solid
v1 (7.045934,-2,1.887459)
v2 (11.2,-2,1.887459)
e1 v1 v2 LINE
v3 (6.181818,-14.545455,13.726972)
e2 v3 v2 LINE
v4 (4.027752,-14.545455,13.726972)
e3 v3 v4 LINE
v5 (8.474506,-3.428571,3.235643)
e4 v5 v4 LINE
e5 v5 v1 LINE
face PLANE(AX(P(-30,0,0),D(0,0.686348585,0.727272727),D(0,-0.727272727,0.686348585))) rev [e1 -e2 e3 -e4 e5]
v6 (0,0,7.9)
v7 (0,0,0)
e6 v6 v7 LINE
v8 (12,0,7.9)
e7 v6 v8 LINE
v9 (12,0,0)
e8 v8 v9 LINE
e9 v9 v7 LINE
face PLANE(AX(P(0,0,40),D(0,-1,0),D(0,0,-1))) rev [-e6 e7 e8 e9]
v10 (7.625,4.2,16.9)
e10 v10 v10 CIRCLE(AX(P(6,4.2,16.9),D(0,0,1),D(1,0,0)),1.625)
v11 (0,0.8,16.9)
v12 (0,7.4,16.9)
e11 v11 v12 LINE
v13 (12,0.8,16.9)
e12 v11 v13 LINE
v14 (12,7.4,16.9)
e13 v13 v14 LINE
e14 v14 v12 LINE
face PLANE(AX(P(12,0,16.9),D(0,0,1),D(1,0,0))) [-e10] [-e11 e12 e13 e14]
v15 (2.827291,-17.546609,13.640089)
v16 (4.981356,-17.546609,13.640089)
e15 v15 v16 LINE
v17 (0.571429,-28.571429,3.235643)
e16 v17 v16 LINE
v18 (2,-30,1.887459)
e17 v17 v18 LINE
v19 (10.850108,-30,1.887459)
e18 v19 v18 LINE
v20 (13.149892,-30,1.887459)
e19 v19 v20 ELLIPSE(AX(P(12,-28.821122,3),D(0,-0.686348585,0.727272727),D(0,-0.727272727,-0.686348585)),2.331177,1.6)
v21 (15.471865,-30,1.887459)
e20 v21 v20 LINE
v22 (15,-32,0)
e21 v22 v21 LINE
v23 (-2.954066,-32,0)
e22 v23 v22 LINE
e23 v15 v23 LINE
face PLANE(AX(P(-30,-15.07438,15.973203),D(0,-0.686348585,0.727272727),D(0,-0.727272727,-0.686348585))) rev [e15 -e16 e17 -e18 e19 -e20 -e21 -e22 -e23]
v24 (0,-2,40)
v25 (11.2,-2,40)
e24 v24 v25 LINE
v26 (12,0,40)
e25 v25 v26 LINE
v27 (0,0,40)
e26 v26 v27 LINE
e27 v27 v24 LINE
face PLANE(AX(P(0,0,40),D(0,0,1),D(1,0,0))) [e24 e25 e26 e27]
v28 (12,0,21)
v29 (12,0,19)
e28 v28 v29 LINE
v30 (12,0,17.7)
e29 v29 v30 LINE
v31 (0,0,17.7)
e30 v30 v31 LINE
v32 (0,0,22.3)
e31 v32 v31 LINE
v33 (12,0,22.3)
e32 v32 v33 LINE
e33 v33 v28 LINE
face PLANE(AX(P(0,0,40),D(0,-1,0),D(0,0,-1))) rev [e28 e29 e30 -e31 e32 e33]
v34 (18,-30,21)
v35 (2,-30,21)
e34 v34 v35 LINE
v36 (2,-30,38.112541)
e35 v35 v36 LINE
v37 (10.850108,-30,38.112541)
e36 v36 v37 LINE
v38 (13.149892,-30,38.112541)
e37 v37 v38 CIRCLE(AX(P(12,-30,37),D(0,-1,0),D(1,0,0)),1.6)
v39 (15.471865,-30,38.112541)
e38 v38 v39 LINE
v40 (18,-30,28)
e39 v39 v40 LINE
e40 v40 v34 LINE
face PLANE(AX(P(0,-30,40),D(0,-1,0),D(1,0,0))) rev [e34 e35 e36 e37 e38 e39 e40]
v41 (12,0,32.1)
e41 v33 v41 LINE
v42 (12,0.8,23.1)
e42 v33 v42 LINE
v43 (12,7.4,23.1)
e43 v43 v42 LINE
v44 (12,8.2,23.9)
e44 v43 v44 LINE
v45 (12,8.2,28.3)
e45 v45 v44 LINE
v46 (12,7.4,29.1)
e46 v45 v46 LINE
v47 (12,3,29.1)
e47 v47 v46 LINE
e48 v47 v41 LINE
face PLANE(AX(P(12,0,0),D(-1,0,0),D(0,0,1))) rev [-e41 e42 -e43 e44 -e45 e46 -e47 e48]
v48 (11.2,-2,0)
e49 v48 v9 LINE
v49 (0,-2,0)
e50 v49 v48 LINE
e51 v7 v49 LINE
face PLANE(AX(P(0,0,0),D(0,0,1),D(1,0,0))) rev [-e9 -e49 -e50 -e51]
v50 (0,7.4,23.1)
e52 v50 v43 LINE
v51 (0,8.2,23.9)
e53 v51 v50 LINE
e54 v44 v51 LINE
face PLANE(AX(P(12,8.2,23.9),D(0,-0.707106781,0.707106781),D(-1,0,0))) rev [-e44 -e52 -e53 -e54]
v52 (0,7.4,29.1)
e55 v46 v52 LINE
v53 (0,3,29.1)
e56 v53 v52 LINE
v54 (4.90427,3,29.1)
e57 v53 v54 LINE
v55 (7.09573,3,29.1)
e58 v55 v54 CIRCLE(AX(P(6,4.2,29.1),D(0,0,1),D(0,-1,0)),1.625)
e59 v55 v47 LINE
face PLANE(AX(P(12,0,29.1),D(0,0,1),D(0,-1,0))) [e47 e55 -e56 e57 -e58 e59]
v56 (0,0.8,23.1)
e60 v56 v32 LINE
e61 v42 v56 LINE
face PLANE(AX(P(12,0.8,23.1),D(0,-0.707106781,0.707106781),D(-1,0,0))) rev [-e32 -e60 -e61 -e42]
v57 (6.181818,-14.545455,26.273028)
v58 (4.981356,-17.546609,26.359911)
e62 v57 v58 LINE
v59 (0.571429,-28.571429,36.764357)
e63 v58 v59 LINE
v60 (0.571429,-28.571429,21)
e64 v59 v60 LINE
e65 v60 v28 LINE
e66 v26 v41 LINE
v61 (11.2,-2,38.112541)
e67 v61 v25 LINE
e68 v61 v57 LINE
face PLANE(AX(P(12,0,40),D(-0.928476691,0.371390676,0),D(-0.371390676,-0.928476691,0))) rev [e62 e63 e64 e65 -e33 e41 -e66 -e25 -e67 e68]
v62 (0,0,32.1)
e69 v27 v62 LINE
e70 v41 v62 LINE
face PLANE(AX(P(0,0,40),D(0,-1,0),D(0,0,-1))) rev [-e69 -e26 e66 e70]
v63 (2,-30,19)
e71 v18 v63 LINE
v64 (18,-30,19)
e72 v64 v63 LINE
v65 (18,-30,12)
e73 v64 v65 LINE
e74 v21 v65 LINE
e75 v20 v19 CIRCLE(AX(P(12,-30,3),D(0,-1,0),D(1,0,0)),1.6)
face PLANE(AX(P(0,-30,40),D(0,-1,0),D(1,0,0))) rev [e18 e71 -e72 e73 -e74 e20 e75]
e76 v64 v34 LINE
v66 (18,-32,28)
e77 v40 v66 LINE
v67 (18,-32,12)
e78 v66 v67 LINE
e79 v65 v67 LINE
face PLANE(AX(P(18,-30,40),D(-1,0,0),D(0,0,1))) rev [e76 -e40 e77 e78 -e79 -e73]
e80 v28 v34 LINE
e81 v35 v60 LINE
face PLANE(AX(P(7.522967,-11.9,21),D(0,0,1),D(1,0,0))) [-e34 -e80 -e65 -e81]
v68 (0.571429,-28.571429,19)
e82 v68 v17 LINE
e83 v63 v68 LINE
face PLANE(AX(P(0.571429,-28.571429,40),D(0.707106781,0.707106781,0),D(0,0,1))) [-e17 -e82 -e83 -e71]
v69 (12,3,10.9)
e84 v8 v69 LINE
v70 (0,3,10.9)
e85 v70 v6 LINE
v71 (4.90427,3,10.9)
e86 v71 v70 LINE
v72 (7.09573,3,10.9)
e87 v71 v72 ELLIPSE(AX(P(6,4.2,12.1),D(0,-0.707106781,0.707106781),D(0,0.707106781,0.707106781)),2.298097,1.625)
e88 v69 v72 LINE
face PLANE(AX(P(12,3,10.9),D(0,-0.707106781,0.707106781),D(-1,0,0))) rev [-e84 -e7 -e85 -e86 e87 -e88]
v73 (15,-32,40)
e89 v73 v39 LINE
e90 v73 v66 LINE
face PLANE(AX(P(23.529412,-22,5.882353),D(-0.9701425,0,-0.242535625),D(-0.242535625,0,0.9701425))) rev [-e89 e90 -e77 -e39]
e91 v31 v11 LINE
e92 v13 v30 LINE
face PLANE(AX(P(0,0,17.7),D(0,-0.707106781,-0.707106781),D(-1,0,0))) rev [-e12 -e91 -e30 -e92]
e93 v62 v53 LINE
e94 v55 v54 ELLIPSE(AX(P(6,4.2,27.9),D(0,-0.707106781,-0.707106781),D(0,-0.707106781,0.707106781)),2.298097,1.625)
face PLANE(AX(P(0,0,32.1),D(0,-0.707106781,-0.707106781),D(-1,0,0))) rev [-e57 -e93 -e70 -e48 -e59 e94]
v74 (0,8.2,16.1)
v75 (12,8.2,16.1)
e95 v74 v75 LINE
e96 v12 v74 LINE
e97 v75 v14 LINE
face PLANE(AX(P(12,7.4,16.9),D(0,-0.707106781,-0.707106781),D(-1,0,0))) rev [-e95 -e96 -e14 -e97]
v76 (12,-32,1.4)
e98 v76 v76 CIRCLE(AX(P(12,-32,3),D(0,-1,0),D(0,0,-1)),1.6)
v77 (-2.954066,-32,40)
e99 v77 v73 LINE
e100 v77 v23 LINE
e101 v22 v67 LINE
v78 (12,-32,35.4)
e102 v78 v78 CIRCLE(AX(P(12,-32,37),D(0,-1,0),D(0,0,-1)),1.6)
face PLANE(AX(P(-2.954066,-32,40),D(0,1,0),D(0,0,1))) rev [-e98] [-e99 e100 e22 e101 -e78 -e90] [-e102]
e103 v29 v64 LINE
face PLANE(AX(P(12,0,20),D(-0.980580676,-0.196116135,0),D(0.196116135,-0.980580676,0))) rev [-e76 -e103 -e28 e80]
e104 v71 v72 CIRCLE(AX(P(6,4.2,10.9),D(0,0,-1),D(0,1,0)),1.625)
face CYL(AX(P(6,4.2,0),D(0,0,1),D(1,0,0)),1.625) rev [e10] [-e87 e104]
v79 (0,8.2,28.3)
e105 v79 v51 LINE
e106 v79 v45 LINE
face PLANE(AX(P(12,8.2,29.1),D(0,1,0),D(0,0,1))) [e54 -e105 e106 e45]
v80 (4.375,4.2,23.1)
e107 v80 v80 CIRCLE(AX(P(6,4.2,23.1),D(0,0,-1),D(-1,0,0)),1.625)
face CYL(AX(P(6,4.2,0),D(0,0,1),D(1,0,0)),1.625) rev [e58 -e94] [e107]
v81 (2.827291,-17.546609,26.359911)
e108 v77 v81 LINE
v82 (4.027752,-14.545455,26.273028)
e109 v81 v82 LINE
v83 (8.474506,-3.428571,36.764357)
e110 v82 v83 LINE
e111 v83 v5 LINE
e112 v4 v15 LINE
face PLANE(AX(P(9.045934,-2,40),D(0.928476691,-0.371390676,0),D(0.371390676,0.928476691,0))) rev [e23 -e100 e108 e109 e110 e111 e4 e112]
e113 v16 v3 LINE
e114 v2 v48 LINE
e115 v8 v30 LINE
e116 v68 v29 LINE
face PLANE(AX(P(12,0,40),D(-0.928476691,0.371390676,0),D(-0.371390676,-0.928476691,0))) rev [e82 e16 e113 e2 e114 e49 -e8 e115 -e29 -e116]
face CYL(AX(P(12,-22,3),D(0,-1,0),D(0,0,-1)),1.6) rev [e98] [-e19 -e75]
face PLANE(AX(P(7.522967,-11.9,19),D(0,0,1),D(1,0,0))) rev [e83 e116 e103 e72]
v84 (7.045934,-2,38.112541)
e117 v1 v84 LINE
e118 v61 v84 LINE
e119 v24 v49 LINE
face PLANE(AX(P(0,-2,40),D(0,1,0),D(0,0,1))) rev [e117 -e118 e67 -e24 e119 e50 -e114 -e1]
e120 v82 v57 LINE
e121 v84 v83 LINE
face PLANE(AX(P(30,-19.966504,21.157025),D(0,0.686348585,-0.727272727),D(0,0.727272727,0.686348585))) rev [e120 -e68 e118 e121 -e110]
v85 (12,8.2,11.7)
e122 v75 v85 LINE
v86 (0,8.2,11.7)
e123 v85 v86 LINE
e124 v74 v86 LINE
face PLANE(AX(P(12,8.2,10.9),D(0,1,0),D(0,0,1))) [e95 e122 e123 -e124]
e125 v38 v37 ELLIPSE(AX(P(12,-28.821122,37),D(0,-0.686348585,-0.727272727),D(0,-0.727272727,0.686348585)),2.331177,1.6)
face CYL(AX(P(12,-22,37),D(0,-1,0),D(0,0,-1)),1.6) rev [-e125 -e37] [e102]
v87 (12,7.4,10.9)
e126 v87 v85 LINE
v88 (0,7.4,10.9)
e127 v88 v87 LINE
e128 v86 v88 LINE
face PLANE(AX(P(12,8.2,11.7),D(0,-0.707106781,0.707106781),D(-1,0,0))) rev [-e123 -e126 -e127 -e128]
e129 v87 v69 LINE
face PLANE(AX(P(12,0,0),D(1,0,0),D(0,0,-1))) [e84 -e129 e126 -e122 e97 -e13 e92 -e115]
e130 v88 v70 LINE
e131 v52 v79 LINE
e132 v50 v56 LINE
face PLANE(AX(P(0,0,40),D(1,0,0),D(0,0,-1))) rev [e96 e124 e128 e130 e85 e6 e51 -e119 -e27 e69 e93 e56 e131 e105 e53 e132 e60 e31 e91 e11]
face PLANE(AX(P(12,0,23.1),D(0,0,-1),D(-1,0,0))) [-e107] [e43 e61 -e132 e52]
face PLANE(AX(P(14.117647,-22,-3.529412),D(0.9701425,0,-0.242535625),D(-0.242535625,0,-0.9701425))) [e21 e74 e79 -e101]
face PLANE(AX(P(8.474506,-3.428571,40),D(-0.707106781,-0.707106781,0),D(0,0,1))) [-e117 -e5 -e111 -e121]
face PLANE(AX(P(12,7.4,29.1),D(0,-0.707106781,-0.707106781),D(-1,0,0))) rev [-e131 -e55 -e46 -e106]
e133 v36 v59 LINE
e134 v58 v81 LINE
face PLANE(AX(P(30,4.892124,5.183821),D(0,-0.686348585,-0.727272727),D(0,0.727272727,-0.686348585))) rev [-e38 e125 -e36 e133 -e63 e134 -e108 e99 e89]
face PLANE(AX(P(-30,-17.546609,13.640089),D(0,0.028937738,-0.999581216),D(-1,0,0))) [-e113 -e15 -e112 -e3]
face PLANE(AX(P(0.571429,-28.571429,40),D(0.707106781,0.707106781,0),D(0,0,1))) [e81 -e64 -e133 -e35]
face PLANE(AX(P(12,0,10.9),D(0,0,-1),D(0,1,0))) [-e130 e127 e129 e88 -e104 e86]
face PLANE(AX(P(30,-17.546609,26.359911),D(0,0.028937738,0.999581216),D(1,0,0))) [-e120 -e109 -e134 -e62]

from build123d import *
from OCP.BRepFilletAPI import BRepFilletAPI_MakeChamfer

# Parameters (mm, degrees)
BOSS_EXTRUDE1_DEPTH     = 40
CUT_EXTRUDE1_DEPTH      = 30
CUT_EXTRUDE1_DEPTH_BACK = 30
CHAMFER1_SIZE           = 2
CHAMFER1_SIZE2          = 1.538618516
CHAMFER1_SIZE2_2        = 2.126587288
SKETCH3_R               = 1.6
CUT_EXTRUDE2_DEPTH      = 10
SKETCH4_W               = 6
SKETCH4_H               = 8.2
BOSS_EXTRUDE2_DEPTH     = 12
CHAMFER2_SIZE           = 3
CHAMFER3_SIZE           = 0.8
CUT_EXTRUDE3_DEPTH      = 47.848799344
CUT_EXTRUDE3_DEPTH_BACK = 47.848799344
SKETCH5_R               = 1.625
RIB1_REACH              = 43.809
SKETCH8_WALL_W          = 116.212296924
SKETCH8_WALL_H          = 2


with BuildPart() as part:
    # Sketch1 → Boss-Extrude1 (new body)
    with BuildSketch(Plane.XY):
        Polygon((0, 0), (12, 0), (0, -30), (18, -30), (18, -32), (-2.954065923, -32), (9.045934077, -2), (0, -2), align=None)
    extrude(amount=BOSS_EXTRUDE1_DEPTH)

    # Sketch2 → Cut-Extrude1 (cut, two sides: drawn at the far end of the back side and taken through both)
    with BuildSketch(Plane.ZY.offset(-CUT_EXTRUDE1_DEPTH_BACK)):
        Polygon((15.099668871, -16), (1.887458609, -2), (0, -2), (0, -32), align=None)
        Polygon((40, -2), (38.112541391, -2), (24.900331129, -16), (40, -32), align=None)
    extrude(amount=CUT_EXTRUDE1_DEPTH + CUT_EXTRUDE1_DEPTH_BACK, mode=Mode.SUBTRACT)

    # Chamfer1: one chamfer whose edges measure the first distance from different faces: ONE call of the kernel's chamfer builder (chamfer() names one face for all edges)
    chamfer1_edges_1 = [part.edges().sort_by_distance(p)[0] for p in [
        (0, -30, 20),
    ]]
    chamfer1_side_1 = [part.faces().sort_by_distance(p)[0] for p in [
        (9, -30, 20),
    ]]
    chamfer1_edges_2 = [part.edges().sort_by_distance(p)[0] for p in [
        (9.045934077, -2, 20),
    ]]
    chamfer1_side_2 = [part.faces().sort_by_distance(p)[0] for p in [
        (4.646047571, -2, 20),
    ]]
    chamfer1_edges_3 = [part.edges().sort_by_distance(p)[0] for p in [
        (4.522967039, -16, 24.900331129),
    ]]
    chamfer1_side_3 = [part.faces().sort_by_distance(p)[0] for p in [
        (7.322967039, -9, 31.50643626),
    ]]
    chamfer1_edges_4 = [part.edges().sort_by_distance(p)[0] for p in [
        (4.522967039, -16, 15.099668871),
    ]]
    chamfer1_side_4 = [part.faces().sort_by_distance(p)[0] for p in [
        (7.322967039, -9, 8.49356374),
    ]]
    chamfer1 = BRepFilletAPI_MakeChamfer(part.part.solid().wrapped)
    for e in chamfer1_edges_1:
        chamfer1.Add(CHAMFER1_SIZE, CHAMFER1_SIZE2, e.wrapped, chamfer1_side_1[0].wrapped)  # the first distance lies on this face
    for e in chamfer1_edges_2:
        chamfer1.Add(CHAMFER1_SIZE, CHAMFER1_SIZE2, e.wrapped, chamfer1_side_2[0].wrapped)  # the first distance lies on this face
    for e in chamfer1_edges_3:
        chamfer1.Add(CHAMFER1_SIZE, CHAMFER1_SIZE2_2, e.wrapped, chamfer1_side_3[0].wrapped)  # the first distance lies on this face
    for e in chamfer1_edges_4:
        chamfer1.Add(CHAMFER1_SIZE, CHAMFER1_SIZE2_2, e.wrapped, chamfer1_side_4[0].wrapped)  # the first distance lies on this face
    add(Compound.cast(chamfer1.Shape()), mode=Mode.REPLACE)

    # Sketch3 → Cut-Extrude2 (cut)
    with BuildSketch(Plane.XZ.offset(32)):
        Polygon((18, 40), (15, 40), (18, 28), align=None)
        Polygon((18, 0), (18, 12), (15, 0), align=None)
        with Locations(Location((12, 37, 0), (0, 0, 270))):
            Circle(SKETCH3_R)
        with Locations(Location((12, 3, 0), (0, 0, 270))):
            Circle(SKETCH3_R)
    extrude(amount=-CUT_EXTRUDE2_DEPTH, mode=Mode.SUBTRACT)

    # Sketch4 → Boss-Extrude2 (add)
    with BuildSketch(Plane.ZY):
        with Locations((13.9, 4.1)):
            Rectangle(SKETCH4_W, SKETCH4_H)
        with Locations((26.1, 4.1)):
            Rectangle(SKETCH4_W, SKETCH4_H)
    extrude(amount=-BOSS_EXTRUDE2_DEPTH)

    # Chamfer2
    chamfer2_edges = [part.edges().sort_by_distance(p)[0] for p in [
        (6, 0, 10.9),
        (6, 0, 29.1),
    ]]
    chamfer(chamfer2_edges, length=CHAMFER2_SIZE)

    # Chamfer3
    # the kernel refuses this chamfer: 0.8 mm, written as the material it adds along each edge
    with BuildSketch(Plane(origin=(0, 0, 16.9), x_dir=(0, 0.9996219169112966, -0.027495876610587354), z_dir=(1, 0, 0))) as chamfer3_piece_1_section:
        Polygon((CHAMFER3_SIZE * 0.999621916911, CHAMFER3_SIZE * 0.0274958766106), (-CHAMFER3_SIZE * 0.0274958766106, CHAMFER3_SIZE * 0.999621916911), (0, 0), align=None)
    chamfer3_piece_1 = extrude(amount=12, mode=Mode.PRIVATE)
    chamfer3_piece_1 = split(chamfer3_piece_1, bisect_by=Plane(origin=(11.263378783, -1.841553042, 17.163829715), z_dir=(-0.9284766908852594, 0.3713906763541038, 0)), keep=Keep.TOP, mode=Mode.PRIVATE)
    add(chamfer3_piece_1)
    with BuildSketch(Plane(origin=(0, 0, 23.1), x_dir=(0, 0.9996219169112966, 0.027495876610587354), z_dir=(1, 0, 0))) as chamfer3_piece_2_section:
        Polygon((CHAMFER3_SIZE * 0.999621916911, -CHAMFER3_SIZE * 0.0274958766106), (-CHAMFER3_SIZE * 0.0274958766106, -CHAMFER3_SIZE * 0.999621916911), (0, 0), align=None)
    chamfer3_piece_2 = extrude(amount=12, mode=Mode.PRIVATE)
    chamfer3_piece_2 = split(chamfer3_piece_2, bisect_by=Plane(origin=(11.263378783, -1.841553042, 22.836170285), z_dir=(-0.9284766908852594, 0.3713906763541038, 0)), keep=Keep.TOP, mode=Mode.PRIVATE)
    add(chamfer3_piece_2)
    # the kernel refuses this chamfer: 0.8 mm, written as the material it takes off along each edge
    with BuildSketch(Plane(origin=(-2.05734639, 8.2, 10.9), x_dir=(0, -0.9996219169112966, -0.02749587661058733), z_dir=(1, 0, 0)), Plane(origin=(-2.05734639, 8.2, 16.9), x_dir=(0, 0.027495876610587302, -0.9996219169112966), z_dir=(1, 0, 0)), Plane(origin=(-2.05734639, 8.2, 29.1), x_dir=(0, 0.027495876610587302, -0.9996219169112966), z_dir=(1, 0, 0)), Plane(origin=(-2.05734639, 8.2, 23.1), x_dir=(0, -0.9996219169112966, -0.02749587661058736), z_dir=(1, 0, 0))) as chamfer3_2_piece_1:
        Polygon((CHAMFER3_SIZE * 0.999621916911, -CHAMFER3_SIZE * 0.0274958766106), (-CHAMFER3_SIZE * 0.0274958766106, -CHAMFER3_SIZE * 0.999621916911), (0, 0), align=None)
    extrude(amount=16.114692781, mode=Mode.SUBTRACT)

    # Sketch5 → Cut-Extrude3 (cut, two sides: drawn at the far end of the back side and taken through both)
    with BuildSketch(Plane.XY.offset(29.1).offset(-CUT_EXTRUDE3_DEPTH_BACK)):
        with Locations(Location((6, 4.2, 0), (0, 0, 312.399473364))):
            Circle(SKETCH5_R)
    extrude(amount=CUT_EXTRUDE3_DEPTH + CUT_EXTRUDE3_DEPTH_BACK, mode=Mode.SUBTRACT)

    # Sketch8 wall → Rib1 (add, up to next)
    with BuildSketch(Plane(origin=(15, -15, 20), x_dir=(0.196116135138, -0.980580675691, 0), z_dir=(0.980580675691, 0.196116135138, 0)), mode=Mode.PRIVATE) as rib1_sk1:
        Rectangle(SKETCH8_WALL_W, SKETCH8_WALL_H)
    rib1_tool1 = extrude(rib1_sk1.sketch, amount=-RIB1_REACH, mode=Mode.PRIVATE) - part.part
    add(rib1_tool1.solids().sort_by_distance((15, -15, 20))[0])


solid = part.part
